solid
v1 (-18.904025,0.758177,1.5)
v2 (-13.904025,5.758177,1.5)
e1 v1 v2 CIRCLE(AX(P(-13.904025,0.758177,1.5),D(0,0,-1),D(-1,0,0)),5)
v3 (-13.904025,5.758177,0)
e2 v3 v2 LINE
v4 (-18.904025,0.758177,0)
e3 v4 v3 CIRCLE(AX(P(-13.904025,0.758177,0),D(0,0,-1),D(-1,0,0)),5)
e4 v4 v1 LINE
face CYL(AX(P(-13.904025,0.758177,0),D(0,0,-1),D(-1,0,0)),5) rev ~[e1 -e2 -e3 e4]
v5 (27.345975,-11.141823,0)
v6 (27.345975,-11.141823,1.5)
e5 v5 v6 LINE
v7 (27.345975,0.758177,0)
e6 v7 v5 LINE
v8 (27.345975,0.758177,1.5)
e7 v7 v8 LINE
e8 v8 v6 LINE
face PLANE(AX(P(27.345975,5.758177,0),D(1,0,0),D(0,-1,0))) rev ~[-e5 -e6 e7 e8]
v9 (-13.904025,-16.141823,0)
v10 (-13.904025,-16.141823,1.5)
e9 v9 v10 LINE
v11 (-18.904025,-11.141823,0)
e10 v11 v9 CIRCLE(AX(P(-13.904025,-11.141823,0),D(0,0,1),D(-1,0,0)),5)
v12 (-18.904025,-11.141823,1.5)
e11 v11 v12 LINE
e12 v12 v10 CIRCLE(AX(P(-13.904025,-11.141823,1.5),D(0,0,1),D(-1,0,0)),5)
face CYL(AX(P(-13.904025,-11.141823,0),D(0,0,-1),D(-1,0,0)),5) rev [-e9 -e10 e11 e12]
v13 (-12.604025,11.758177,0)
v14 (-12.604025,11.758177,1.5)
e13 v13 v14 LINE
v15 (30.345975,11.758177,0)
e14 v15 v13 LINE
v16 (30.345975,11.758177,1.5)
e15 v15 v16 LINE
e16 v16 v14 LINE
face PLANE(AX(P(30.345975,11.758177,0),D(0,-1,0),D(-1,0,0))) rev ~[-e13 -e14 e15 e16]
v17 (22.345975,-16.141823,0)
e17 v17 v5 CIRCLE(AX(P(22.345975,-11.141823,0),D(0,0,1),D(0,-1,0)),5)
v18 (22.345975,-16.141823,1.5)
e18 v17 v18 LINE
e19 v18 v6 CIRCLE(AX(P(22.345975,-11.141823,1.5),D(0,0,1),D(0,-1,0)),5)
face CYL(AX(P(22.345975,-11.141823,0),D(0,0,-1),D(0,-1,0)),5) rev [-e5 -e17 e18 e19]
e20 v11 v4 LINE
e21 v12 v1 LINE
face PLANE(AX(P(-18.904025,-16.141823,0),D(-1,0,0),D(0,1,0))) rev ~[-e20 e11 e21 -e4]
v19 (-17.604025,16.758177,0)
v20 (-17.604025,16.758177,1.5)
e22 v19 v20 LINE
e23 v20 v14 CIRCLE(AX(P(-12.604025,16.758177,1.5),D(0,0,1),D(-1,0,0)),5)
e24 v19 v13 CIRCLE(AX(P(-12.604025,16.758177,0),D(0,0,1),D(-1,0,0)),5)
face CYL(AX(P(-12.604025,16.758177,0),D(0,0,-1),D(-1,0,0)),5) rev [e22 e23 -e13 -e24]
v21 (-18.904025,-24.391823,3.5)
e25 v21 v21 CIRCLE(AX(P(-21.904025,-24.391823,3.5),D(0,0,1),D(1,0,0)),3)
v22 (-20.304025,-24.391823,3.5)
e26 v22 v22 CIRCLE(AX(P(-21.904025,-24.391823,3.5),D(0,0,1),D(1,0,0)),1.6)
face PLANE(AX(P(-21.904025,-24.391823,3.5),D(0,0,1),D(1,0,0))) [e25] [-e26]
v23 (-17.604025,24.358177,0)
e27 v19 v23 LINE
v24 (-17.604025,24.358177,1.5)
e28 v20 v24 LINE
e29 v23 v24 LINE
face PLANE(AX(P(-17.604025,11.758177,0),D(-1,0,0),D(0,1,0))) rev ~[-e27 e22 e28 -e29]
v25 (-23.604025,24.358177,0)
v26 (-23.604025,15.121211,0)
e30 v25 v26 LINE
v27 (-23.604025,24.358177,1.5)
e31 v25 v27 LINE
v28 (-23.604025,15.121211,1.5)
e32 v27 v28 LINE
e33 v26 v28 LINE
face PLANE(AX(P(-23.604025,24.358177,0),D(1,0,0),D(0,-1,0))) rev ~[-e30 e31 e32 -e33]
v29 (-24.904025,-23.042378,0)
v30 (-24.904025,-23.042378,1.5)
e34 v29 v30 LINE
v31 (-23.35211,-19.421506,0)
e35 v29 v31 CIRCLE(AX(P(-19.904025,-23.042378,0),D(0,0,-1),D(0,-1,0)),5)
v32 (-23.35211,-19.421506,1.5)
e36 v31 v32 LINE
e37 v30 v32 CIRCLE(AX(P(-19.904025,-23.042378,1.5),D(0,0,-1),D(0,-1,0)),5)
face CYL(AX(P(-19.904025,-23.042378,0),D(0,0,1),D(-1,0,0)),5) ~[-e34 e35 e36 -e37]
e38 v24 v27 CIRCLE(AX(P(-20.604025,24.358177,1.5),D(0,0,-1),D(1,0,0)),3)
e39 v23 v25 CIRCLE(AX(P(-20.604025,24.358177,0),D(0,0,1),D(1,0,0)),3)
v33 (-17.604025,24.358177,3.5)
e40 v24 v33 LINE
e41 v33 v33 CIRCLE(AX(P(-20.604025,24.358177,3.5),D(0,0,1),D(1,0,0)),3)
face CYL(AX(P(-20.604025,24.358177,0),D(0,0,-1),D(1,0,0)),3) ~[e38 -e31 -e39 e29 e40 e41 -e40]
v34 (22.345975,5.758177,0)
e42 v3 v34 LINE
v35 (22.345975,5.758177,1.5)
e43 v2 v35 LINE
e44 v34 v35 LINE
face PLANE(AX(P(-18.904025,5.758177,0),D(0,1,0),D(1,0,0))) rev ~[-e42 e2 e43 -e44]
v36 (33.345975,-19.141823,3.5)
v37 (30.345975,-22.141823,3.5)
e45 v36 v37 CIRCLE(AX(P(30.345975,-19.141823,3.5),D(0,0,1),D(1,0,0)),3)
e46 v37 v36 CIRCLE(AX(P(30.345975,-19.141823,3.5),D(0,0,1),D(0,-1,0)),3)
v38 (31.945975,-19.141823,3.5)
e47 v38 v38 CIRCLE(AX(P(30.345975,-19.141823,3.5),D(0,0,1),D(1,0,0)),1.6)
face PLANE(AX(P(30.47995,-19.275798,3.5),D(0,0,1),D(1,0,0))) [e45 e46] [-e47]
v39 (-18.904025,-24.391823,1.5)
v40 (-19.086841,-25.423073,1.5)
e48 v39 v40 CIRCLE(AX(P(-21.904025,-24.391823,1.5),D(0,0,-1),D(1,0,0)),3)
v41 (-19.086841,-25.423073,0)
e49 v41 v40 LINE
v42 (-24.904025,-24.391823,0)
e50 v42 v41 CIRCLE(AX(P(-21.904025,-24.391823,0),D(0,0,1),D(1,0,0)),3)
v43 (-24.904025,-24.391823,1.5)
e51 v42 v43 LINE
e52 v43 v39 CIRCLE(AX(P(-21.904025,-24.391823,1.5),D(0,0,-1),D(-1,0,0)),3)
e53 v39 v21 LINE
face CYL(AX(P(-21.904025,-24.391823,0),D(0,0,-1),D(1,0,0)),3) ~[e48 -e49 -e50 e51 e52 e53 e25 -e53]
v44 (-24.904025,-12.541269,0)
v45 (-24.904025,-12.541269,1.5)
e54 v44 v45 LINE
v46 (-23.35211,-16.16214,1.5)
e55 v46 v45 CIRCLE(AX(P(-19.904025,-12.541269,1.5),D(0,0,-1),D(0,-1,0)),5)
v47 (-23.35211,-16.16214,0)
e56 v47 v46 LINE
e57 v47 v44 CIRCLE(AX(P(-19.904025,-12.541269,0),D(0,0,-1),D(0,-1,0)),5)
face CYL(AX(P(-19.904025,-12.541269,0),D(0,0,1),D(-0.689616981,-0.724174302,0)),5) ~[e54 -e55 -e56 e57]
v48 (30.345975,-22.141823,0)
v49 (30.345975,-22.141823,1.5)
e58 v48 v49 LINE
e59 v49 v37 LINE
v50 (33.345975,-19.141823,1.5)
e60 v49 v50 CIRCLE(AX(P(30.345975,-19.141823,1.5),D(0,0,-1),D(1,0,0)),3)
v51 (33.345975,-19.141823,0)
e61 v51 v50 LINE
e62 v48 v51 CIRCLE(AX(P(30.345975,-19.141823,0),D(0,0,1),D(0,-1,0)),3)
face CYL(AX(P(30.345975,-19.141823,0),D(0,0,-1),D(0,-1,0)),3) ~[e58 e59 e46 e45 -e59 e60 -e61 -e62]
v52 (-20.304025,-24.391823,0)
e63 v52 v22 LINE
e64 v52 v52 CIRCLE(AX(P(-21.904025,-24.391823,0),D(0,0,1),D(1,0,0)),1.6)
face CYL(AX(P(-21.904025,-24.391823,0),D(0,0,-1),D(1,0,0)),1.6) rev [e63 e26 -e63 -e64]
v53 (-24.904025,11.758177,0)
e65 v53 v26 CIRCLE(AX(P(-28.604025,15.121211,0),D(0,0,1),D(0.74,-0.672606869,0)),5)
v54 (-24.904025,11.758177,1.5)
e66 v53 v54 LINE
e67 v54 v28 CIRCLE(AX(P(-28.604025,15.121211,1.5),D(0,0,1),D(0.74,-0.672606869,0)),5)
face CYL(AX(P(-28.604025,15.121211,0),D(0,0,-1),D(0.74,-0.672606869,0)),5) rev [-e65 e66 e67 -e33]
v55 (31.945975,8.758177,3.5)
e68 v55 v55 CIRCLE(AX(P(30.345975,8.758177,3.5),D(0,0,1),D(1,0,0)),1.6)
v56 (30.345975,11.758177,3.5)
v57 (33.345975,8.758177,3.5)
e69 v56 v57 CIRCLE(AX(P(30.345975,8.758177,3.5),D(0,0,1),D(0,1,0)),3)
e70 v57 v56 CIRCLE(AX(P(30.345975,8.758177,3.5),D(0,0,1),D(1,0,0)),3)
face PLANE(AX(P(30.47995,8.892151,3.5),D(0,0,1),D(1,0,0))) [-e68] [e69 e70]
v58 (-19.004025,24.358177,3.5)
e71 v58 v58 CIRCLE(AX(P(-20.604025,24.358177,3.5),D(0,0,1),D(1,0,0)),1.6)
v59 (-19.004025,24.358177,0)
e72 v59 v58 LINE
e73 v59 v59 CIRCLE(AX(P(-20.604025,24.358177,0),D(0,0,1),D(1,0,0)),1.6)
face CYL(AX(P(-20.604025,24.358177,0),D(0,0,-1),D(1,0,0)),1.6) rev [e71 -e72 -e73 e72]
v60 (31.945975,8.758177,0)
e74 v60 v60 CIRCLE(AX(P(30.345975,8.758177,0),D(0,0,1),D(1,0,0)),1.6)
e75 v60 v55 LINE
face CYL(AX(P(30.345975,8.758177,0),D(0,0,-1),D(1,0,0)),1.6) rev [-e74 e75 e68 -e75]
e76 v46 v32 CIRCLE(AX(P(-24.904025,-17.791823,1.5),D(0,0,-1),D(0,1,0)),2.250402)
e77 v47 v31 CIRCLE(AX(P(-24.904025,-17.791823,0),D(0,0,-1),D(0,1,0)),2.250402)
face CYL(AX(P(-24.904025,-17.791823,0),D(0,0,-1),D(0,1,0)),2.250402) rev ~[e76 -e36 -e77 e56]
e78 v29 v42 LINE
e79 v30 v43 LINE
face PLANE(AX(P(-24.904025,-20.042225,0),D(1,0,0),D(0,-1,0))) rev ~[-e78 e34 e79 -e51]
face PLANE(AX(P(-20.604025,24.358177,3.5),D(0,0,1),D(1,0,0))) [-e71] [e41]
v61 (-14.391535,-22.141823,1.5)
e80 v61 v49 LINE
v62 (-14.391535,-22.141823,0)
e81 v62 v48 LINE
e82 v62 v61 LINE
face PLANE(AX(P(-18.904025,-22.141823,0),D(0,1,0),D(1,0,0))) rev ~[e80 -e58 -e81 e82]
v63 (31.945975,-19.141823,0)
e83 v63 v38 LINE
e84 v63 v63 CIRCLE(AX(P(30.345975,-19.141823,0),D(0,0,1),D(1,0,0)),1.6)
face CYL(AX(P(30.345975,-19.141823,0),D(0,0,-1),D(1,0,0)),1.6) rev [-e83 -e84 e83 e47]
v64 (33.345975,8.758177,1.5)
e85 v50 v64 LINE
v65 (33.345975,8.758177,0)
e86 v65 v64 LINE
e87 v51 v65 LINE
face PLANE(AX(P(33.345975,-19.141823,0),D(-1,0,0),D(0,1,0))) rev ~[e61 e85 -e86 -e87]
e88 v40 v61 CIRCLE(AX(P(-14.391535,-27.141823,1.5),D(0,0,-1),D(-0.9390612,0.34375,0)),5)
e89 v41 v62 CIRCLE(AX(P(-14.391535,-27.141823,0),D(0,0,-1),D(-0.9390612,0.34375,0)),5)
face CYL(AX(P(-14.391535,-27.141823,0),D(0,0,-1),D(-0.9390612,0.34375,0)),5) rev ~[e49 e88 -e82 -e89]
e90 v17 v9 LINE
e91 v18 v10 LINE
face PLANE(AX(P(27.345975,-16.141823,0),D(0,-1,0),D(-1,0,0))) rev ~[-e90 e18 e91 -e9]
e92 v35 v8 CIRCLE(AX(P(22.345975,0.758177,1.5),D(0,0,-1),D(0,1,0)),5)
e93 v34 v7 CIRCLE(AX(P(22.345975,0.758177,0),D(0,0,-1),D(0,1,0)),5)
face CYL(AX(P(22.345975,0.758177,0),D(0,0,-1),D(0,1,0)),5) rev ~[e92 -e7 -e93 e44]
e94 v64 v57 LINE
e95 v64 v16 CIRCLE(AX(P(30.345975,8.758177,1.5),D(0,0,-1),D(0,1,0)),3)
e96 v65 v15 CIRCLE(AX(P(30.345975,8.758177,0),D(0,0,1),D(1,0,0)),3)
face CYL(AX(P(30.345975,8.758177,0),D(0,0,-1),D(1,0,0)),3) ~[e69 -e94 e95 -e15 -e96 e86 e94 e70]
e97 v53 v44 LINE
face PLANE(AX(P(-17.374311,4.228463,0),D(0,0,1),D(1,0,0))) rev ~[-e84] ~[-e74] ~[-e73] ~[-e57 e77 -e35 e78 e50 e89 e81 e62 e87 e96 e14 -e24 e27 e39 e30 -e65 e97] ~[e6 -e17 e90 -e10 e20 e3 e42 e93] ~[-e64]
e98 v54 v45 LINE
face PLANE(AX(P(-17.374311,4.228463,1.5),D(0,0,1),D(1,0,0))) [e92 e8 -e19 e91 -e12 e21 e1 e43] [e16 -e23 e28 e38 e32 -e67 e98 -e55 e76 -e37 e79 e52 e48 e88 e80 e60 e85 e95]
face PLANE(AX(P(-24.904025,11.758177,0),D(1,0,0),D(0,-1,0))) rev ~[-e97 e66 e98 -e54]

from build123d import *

# Parameters (mm, degrees)
F0_R        = 1.6
F1_DEPTH    = 1.5
F2_DEPTH    = 3.5
F3_T1_DEPTH = 1.5
F4_R        = 5


# Not quite as in the source:
# - a fillet or chamfer that OpenCascade refuses, or shapes differently, is made with other operations: its cross-section is extruded or revolved along the edge and cut away or added
# - a feature names something its author has since deleted; it is built from what else it names


with BuildPart() as f1:
    # F0 (on Top) → F1 (new body)
    with BuildSketch(Plane.XY):
        with BuildLine():
            Line((-18.9040250808, 5.7581766099), (-18.9040250808, 11.7581766099))
            Line((-18.9040250808, 11.7581766099), (-23.6040250808, 11.7581766099))
            Line((-23.6040250808, 11.7581766099), (-24.9040250808, 11.7581766099))
            Line((-24.9040250808, 11.7581766099), (-24.9040250808, -15.541421883))
            ThreePointArc((-24.9040250808, -15.541421883), (-22.6536235737, -17.7918233901), (-24.9040250808, -20.0422248973))
            Line((-24.9040250808, -20.0422248973), (-24.9040250808, -24.3918233901))
            ThreePointArc((-24.9040250808, -24.3918233901), (-21.9040250808, -21.3918233901), (-18.9040250808, -24.3918233901))
            Line((-18.9040250808, -24.3918233901), (-18.9040250808, -22.1418233901))
            Line((-18.9040250808, -22.1418233901), (-18.9040250808, -16.1418233901))
            Line((-18.9040250808, -16.1418233901), (-18.9040250808, 5.7581766099))
        make_face()
        with BuildLine():
            ThreePointArc((33.3459749192, 8.7581766099), (28.2246545756, 6.6368562663), (30.3459749192, 11.7581766099))
            Line((30.3459749192, 11.7581766099), (-17.6040250808, 11.7581766099))
            Line((-17.6040250808, 11.7581766099), (-18.9040250808, 11.7581766099))
            Line((-18.9040250808, 11.7581766099), (-18.9040250808, 5.7581766099))
            Line((-18.9040250808, 5.7581766099), (27.3459749192, 5.7581766099))
            Line((27.3459749192, 5.7581766099), (27.3459749192, -16.1418233901))
            Line((27.3459749192, -16.1418233901), (-18.9040250808, -16.1418233901))
            Line((-18.9040250808, -16.1418233901), (-18.9040250808, -22.1418233901))
            Line((-18.9040250808, -22.1418233901), (30.3459749192, -22.1418233901))
            ThreePointArc((30.3459749192, -22.1418233901), (28.2246545756, -17.0205030466), (33.3459749192, -19.1418233901))
            Line((33.3459749192, -19.1418233901), (33.3459749192, 8.7581766099))
        make_face()
        with BuildLine():
            ThreePointArc((-24.9040250808, -24.3918233901), (-21.9040250808, -27.3918233901), (-18.9040250808, -24.3918233901))
            ThreePointArc((-18.9040250808, -24.3918233901), (-21.9040250808, -21.3918233901), (-24.9040250808, -24.3918233901))
        make_face()
        with Locations((-21.9040250808, -24.3918233901)):
            Circle(F0_R, mode=Mode.SUBTRACT)
        with BuildLine():
            ThreePointArc((30.3459749192, -22.1418233901), (32.4672952628, -21.2631437337), (33.3459749192, -19.1418233901))
            ThreePointArc((33.3459749192, -19.1418233901), (28.2246545756, -17.0205030466), (30.3459749192, -22.1418233901))
        make_face()
        with Locations((30.3459749192, -19.1418233901)):
            Circle(F0_R, mode=Mode.SUBTRACT)
        with BuildLine():
            ThreePointArc((33.3459749192, 8.7581766099), (32.4672952628, 10.8794969534), (30.3459749192, 11.7581766099))
            ThreePointArc((30.3459749192, 11.7581766099), (28.2246545756, 6.6368562663), (33.3459749192, 8.7581766099))
        make_face()
        with Locations((30.3459749192, 8.7581766099)):
            Circle(F0_R, mode=Mode.SUBTRACT)
        with BuildLine():
            Line((-18.9040250808, 11.7581766099), (-17.6040250808, 11.7581766099))
            Line((-17.6040250808, 11.7581766099), (-17.6040250808, 24.3581766099))
            ThreePointArc((-17.6040250808, 24.3581766099), (-20.6040250808, 21.3581766099), (-23.6040250808, 24.3581766099))
            Line((-23.6040250808, 24.3581766099), (-23.6040250808, 11.7581766099))
            Line((-23.6040250808, 11.7581766099), (-18.9040250808, 11.7581766099))
        make_face()
        with BuildLine():
            ThreePointArc((-23.6040250808, 24.3581766099), (-20.6040250808, 21.3581766099), (-17.6040250808, 24.3581766099))
            ThreePointArc((-17.6040250808, 24.3581766099), (-20.6040250808, 27.3581766099), (-23.6040250808, 24.3581766099))
        make_face()
        with Locations((-20.6040250808, 24.3581766099)):
            Circle(F0_R, mode=Mode.SUBTRACT)
    extrude(amount=F1_DEPTH)

    # F0 (on Top) → F2 (join)
    with BuildSketch(Plane.XY):
        with BuildLine():
            ThreePointArc((-24.9040250808, -24.3918233901), (-21.9040250808, -27.3918233901), (-18.9040250808, -24.3918233901))
            ThreePointArc((-18.9040250808, -24.3918233901), (-21.9040250808, -21.3918233901), (-24.9040250808, -24.3918233901))
        make_face()
        with Locations((-21.9040250808, -24.3918233901)):
            Circle(F0_R, mode=Mode.SUBTRACT)
        with BuildLine():
            ThreePointArc((33.3459749192, 8.7581766099), (32.4672952628, 10.8794969534), (30.3459749192, 11.7581766099))
            ThreePointArc((30.3459749192, 11.7581766099), (28.2246545756, 6.6368562663), (33.3459749192, 8.7581766099))
        make_face()
        with Locations((30.3459749192, 8.7581766099)):
            Circle(F0_R, mode=Mode.SUBTRACT)
        with BuildLine():
            ThreePointArc((30.3459749192, -22.1418233901), (32.4672952628, -21.2631437337), (33.3459749192, -19.1418233901))
            ThreePointArc((33.3459749192, -19.1418233901), (28.2246545756, -17.0205030466), (30.3459749192, -22.1418233901))
        make_face()
        with Locations((30.3459749192, -19.1418233901)):
            Circle(F0_R, mode=Mode.SUBTRACT)
        with BuildLine():
            ThreePointArc((-23.6040250808, 24.3581766099), (-20.6040250808, 21.3581766099), (-17.6040250808, 24.3581766099))
            ThreePointArc((-17.6040250808, 24.3581766099), (-20.6040250808, 27.3581766099), (-23.6040250808, 24.3581766099))
        make_face()
        with Locations((-20.6040250808, 24.3581766099)):
            Circle(F0_R, mode=Mode.SUBTRACT)
    extrude(amount=F2_DEPTH)

    # F3: fillet of radius 5 on 7 edges, made by hand

    # F3_s2 → F3_t1 (join)
    with BuildSketch(Plane.XY):
        with BuildLine():
            ThreePointArc((-18.9040250808, 0.7581766099), (-17.4395589867, 4.2937105158), (-13.9040250808, 5.7581766099))
            Line((-13.9040250808, 5.7581766099), (-18.9040250808, 5.7581766099))
            Line((-18.9040250808, 5.7581766099), (-18.9040250808, 0.7581766099))
        make_face()
        with BuildLine():
            ThreePointArc((-18.9040250808, -11.1418233901), (-17.4395589867, -14.6773572961), (-13.9040250808, -16.1418233901))
            Line((-13.9040250808, -16.1418233901), (-18.9040250808, -16.1418233901))
            Line((-18.9040250808, -16.1418233901), (-18.9040250808, -11.1418233901))
        make_face()
        with BuildLine():
            ThreePointArc((22.3459749192, 5.7581766099), (25.8815088251, 4.2937105158), (27.3459749192, 0.7581766099))
            Line((27.3459749192, 0.7581766099), (27.3459749192, 5.7581766099))
            Line((27.3459749192, 5.7581766099), (22.3459749192, 5.7581766099))
        make_face()
        with BuildLine():
            ThreePointArc((22.3459749192, -16.1418233901), (25.8815088251, -14.6773572961), (27.3459749192, -11.1418233901))
            Line((27.3459749192, -11.1418233901), (27.3459749192, -16.1418233901))
            Line((27.3459749192, -16.1418233901), (22.3459749192, -16.1418233901))
        make_face()
        with BuildLine():
            ThreePointArc((-17.6040250808, 16.7581766099), (-16.1395589867, 13.2226427039), (-12.6040250808, 11.7581766099))
            Line((-12.6040250808, 11.7581766099), (-17.6040250808, 11.7581766099))
            Line((-17.6040250808, 11.7581766099), (-17.6040250808, 16.7581766099))
        make_face()
        with BuildLine():
            ThreePointArc((-24.9040250808, 11.7581766099), (-23.9403355543, 13.3184353163), (-23.6040250808, 15.121210954))
            Line((-23.6040250808, 15.121210954), (-23.6040250808, 11.7581766099))
            Line((-23.6040250808, 11.7581766099), (-24.9040250808, 11.7581766099))
        make_face()
        with BuildLine():
            ThreePointArc((-19.0868414806, -25.4230733901), (-17.2556452895, -23.0434243124), (-14.3915354801, -22.1418233901))
            Line((-14.3915354801, -22.1418233901), (-14.3915354801, -21.6418233901))
            Line((-14.3915354801, -21.6418233901), (-18.9040250808, -21.6418233901))
            Line((-18.9040250808, -21.6418233901), (-19.4040250808, -22.1418233901))
            ThreePointArc((-19.4040250808, -22.1418233901), (-19.4040250808, -24.3918233901), (-19.5563720806, -25.2511983901))
            Line((-19.5563720806, -25.2511983901), (-19.0868414806, -25.4230733901))
        make_face()
    extrude(amount=F3_T1_DEPTH)

    # F4
    f4_edges = [f1.edges().sort_by_distance(p)[0] for p in [
        (-24.904025, -15.541422, 0.75),
        (-24.904025, -20.042225, 0.75),
    ]]
    fillet(f4_edges, radius=F4_R)


solid = f1.part
